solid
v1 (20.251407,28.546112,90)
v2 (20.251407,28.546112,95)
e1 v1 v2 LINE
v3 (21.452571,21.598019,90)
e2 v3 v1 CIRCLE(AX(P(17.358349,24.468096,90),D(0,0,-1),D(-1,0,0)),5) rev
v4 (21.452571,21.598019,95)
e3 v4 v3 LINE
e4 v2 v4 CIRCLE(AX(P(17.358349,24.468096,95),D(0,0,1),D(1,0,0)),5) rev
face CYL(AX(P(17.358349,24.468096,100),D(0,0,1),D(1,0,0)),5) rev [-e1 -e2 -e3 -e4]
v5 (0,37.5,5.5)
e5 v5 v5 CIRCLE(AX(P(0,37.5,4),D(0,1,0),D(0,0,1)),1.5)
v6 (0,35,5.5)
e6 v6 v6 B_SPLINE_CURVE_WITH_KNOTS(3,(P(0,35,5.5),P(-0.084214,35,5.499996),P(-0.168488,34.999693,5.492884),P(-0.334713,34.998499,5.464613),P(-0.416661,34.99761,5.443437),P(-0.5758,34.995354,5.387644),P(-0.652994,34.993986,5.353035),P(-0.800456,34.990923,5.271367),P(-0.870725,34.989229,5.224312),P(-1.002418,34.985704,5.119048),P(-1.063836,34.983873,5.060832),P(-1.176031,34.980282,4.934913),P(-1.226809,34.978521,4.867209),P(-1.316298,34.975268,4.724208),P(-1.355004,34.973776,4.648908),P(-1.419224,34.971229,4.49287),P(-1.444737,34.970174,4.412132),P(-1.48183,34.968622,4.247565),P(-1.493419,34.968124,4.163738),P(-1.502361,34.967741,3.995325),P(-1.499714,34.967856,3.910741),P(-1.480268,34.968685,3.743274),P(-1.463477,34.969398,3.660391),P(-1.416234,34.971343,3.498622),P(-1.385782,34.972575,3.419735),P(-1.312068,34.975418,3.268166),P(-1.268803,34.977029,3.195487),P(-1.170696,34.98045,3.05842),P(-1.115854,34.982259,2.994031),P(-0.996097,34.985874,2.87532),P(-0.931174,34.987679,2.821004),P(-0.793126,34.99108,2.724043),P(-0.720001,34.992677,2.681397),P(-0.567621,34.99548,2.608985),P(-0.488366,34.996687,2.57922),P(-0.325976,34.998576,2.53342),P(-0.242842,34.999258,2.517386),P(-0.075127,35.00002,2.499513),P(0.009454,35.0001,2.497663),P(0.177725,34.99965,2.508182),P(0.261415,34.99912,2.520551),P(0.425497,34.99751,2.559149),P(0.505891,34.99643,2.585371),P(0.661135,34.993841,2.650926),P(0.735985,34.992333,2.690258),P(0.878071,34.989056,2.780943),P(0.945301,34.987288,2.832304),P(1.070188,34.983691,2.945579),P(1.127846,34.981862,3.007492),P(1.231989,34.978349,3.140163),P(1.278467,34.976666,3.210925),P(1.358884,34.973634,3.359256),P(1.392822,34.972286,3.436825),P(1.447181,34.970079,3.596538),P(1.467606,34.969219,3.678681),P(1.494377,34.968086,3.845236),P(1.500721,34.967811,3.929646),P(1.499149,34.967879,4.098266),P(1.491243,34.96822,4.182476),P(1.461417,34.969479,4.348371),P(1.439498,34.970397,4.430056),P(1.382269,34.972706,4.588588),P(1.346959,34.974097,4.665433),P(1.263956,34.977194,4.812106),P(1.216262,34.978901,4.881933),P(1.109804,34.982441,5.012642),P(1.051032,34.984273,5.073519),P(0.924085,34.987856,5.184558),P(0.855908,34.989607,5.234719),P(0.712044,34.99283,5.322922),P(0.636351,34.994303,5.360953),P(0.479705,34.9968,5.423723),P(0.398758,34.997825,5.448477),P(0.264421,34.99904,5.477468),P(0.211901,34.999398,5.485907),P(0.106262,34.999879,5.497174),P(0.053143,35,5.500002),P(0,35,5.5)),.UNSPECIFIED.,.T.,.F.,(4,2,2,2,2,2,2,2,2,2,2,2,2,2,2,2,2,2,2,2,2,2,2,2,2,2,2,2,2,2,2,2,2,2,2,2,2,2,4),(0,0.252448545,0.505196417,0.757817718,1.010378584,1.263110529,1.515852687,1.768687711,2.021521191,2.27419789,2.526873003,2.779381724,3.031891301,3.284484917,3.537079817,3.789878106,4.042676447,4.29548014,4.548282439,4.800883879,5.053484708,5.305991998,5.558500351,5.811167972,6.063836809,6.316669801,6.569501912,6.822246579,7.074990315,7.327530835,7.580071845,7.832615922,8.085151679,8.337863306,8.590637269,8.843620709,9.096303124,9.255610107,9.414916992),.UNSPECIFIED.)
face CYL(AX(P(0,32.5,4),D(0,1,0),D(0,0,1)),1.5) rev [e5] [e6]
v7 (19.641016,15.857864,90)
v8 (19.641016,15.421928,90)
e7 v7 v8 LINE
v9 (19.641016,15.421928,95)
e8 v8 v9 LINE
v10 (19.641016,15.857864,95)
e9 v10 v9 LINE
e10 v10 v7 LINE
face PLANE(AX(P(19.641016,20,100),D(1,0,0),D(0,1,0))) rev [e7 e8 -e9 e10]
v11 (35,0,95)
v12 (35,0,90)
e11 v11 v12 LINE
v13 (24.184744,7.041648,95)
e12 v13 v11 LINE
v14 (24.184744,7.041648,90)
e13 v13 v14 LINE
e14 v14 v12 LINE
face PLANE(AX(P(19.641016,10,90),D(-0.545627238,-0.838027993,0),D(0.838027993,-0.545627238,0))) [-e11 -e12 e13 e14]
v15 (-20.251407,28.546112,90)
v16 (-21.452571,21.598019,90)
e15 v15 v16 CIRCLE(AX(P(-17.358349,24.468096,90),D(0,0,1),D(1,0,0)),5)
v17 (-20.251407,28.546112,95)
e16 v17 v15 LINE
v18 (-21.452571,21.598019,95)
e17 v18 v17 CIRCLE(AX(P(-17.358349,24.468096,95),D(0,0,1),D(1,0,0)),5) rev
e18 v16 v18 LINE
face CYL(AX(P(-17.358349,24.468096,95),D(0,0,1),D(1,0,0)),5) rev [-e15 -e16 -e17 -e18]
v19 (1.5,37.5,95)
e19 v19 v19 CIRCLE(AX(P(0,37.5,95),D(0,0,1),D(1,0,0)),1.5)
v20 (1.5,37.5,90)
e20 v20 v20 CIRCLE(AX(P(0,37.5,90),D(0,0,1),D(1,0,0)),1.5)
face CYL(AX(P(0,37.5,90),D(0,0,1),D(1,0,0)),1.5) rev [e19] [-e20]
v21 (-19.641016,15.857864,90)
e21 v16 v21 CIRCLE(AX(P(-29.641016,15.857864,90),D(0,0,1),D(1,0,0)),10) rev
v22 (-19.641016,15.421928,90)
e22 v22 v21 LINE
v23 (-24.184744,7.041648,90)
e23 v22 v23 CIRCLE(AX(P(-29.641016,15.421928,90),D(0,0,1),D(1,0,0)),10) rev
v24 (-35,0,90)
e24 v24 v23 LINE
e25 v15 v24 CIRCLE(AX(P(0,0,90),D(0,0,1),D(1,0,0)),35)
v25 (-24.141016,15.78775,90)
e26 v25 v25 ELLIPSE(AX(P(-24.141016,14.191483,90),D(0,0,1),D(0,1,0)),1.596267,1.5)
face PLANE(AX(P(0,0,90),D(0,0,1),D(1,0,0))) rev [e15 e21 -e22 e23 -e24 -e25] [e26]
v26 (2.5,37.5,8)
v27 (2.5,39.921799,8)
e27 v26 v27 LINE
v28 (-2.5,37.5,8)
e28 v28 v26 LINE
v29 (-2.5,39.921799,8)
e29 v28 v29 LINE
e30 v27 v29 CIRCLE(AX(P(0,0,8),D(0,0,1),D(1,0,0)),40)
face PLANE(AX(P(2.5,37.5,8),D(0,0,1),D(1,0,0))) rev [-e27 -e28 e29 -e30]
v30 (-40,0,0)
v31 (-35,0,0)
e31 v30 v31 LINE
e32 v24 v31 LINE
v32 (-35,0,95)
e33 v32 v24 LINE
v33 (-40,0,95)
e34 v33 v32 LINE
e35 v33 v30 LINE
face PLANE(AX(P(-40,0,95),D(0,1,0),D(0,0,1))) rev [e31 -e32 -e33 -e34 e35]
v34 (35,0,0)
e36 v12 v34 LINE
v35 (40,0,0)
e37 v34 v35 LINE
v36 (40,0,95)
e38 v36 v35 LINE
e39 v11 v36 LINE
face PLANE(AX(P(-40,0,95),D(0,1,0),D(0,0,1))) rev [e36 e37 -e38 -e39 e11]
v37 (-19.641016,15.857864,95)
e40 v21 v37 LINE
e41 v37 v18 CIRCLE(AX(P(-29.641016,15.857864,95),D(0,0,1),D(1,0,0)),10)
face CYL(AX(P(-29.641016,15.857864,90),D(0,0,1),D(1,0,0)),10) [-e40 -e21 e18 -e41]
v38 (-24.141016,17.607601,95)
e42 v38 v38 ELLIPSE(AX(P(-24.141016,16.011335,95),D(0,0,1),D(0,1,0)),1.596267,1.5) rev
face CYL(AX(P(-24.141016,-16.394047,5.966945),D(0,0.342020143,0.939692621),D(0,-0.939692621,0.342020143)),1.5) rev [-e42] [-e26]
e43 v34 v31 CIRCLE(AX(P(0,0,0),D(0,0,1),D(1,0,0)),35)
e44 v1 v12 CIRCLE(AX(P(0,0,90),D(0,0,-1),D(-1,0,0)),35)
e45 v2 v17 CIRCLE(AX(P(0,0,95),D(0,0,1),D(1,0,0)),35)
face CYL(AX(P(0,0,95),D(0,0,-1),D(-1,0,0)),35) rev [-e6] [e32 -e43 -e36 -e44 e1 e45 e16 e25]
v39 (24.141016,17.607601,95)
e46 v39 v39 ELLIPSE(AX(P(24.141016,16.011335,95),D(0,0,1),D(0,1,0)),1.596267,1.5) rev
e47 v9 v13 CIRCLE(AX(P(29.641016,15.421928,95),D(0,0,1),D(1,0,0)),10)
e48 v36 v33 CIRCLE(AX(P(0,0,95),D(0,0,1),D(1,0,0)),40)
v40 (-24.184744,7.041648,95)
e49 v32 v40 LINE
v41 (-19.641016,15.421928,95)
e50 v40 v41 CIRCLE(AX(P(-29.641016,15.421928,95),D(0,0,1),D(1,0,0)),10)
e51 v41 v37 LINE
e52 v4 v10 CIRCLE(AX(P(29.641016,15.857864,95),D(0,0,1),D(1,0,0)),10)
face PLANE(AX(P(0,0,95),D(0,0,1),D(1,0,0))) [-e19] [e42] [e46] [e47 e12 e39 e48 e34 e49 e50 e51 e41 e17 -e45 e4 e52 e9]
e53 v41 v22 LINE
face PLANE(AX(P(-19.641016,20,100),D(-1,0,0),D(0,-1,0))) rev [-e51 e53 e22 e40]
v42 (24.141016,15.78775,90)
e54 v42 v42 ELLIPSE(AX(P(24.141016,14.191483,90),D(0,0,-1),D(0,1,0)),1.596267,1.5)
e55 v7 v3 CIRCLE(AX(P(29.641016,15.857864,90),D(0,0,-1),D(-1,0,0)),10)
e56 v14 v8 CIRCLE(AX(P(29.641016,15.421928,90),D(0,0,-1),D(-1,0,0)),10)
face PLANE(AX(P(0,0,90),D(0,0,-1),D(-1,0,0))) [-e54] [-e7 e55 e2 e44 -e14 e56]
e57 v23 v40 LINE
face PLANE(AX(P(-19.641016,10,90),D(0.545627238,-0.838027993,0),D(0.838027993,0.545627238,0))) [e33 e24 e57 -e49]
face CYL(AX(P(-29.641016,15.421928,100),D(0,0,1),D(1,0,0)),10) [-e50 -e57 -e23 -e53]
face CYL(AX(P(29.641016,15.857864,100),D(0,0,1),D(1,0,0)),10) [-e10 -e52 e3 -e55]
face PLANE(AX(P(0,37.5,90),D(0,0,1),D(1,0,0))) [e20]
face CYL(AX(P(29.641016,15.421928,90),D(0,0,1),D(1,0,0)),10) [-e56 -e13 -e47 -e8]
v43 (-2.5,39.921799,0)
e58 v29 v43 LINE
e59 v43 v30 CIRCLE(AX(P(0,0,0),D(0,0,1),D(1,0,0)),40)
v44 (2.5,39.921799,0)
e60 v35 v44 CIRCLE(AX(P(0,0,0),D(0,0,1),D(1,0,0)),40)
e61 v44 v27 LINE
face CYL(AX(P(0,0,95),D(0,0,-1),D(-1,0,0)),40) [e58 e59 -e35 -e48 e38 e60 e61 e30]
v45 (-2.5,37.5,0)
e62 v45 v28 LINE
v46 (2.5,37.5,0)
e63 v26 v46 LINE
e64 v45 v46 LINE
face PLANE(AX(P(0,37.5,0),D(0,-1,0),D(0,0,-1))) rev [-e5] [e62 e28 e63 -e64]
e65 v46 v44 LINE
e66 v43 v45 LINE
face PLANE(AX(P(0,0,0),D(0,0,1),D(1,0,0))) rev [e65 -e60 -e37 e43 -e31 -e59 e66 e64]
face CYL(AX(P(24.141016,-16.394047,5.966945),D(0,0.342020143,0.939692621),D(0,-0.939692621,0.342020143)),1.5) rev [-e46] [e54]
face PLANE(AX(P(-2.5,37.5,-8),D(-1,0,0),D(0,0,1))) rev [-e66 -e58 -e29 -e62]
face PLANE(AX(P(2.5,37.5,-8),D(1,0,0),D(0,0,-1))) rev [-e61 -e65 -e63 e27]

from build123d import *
from OCP.BRepFilletAPI import BRepFilletAPI_MakeChamfer

# Parameters (mm, degrees)
SALIENTE_EXTRUIR1_DEPTH = 95
VACIADO1_T              = -5
CORTAR_EXTRUIR1_DEPTH   = 2.5
CROQUIS3_R              = 1.5
CORTAR_EXTRUIR4_DEPTH   = 5
SALIENTE_EXTRUIR2_DEPTH = 5
CHAFL_N1_SIZE           = 5
CHAFL_N1_SIZE2          = 1.819851171331016
CROQUIS5_R              = 1.5000000000000009
CORTAR_EXTRUIR5_DEPTH   = 107.86778586495213
CROQUIS6_W              = 80
CROQUIS6_H              = 6.500000000000014
CORTAR_EXTRUIR6_DEPTH   = 115.89125293076057
SALIENTE_EXTRUIR3_START = -5
SALIENTE_EXTRUIR3_DEPTH = 5
REDONDEO1_R             = 10
REDONDEO2_R             = 5
CROQUIS8_R              = 1.5000000000000004
CORTAR_EXTRUIR7_DEPTH   = 5


with BuildPart() as part:
    # Croquis1 → Saliente-Extruir1 (new body)
    with BuildSketch(Plane.XY):
        with BuildLine():
            Line((-40, 0), (40, 0))
            ThreePointArc((40, 0), (2.45e-15, 40), (-40, 0))
        make_face()
    extrude(amount=SALIENTE_EXTRUIR1_DEPTH)

    # Vaciado1
    vaciado1_openings = [part.faces().sort_by_distance(p)[0] for p in [
        (0, 16.976527263, 95),
        (0, 16.976527263, 0),
        (0, 0, 47.5),
    ]]
    offset(amount=VACIADO1_T, openings=vaciado1_openings)

    # Croquis2 → Cortar-Extruir1 (cut)
    with BuildSketch(Plane(origin=(0, 40, 0), x_dir=(1, 0, 0), z_dir=(0, 1, 0))):
        Polygon((2.499999999999998, 8), (-2.500000000000002, 8), (-2.499999999999997, -8), (2.500000000000003, -8), align=None)
    extrude(amount=-CORTAR_EXTRUIR1_DEPTH, mode=Mode.SUBTRACT)

    # Croquis3 → Cortar-Extruir4 (cut)
    with BuildSketch(Plane(origin=(0, 37.5, 0), x_dir=(1, 0, 0), z_dir=(0, 1, 0))):
        with Locations(Location((3.04e-15, -4.0000000000000036, 0), (0, 0, 270))):
            Circle(CROQUIS3_R)
    extrude(amount=-CORTAR_EXTRUIR4_DEPTH, mode=Mode.SUBTRACT)

    # Croquis4 → Saliente-Extruir2 (add, symmetric)
    with BuildSketch(Plane.XY.offset(95)):
        with BuildLine():
            Line((34.64101615137755, 20), (19.641016151377546, 20))
            Line((19.641016151377546, 20), (19.641016151377542, 9.999999999999998))
            Line((19.641016151377542, 9.999999999999998), (38.72983346207417, 10))
            ThreePointArc((38.72983346207417, 10), (37.024591736438325, 15.138679161342415), (34.64101615137755, 20))
        make_face()
        with BuildLine():
            Line((-19.641016151377542, 9.999999999999998), (-38.72983346207417, 10))
            ThreePointArc((-38.72983346207417, 10), (-37.024591736438325, 15.138679161342413), (-34.64101615137755, 20))
            Line((-34.64101615137755, 20), (-19.641016151377546, 20))
            Line((-19.641016151377546, 20), (-19.641016151377542, 9.999999999999998))
        make_face()
    extrude(amount=SALIENTE_EXTRUIR2_DEPTH, both=True)

    # Chaflán1: one chamfer whose edges measure the first distance from different faces: ONE call of the kernel's chamfer builder (chamfer() names one face for all edges)
    chafl_n1_edges_1 = [part.edges().sort_by_distance(p)[0] for p in [
        (27.14101615137755, 20, 100),
    ]]
    chafl_n1_side_1 = [part.faces().sort_by_distance(p)[0] for p in [
        (28.335600223521073, 14.80398786251226, 100),
    ]]
    chafl_n1_edges_2 = [part.edges().sort_by_distance(p)[0] for p in [
        (-27.14101615137755, 20, 100),
    ]]
    chafl_n1_side_2 = [part.faces().sort_by_distance(p)[0] for p in [
        (-28.33560022352108, 14.803987862512262, 100),
    ]]
    chafl_n1 = BRepFilletAPI_MakeChamfer(part.part.solid().wrapped)
    for e in chafl_n1_edges_1:
        chafl_n1.Add(CHAFL_N1_SIZE, CHAFL_N1_SIZE2, e.wrapped, chafl_n1_side_1[0].wrapped)  # the first distance lies on this face
    for e in chafl_n1_edges_2:
        chafl_n1.Add(CHAFL_N1_SIZE, CHAFL_N1_SIZE2, e.wrapped, chafl_n1_side_2[0].wrapped)  # the first distance lies on this face
    add(Compound.cast(chafl_n1.Shape()), mode=Mode.REPLACE)

    # Croquis5 → Cortar-Extruir5 (cut, through all)
    with BuildSketch(Plane(origin=(0, 33.89404716093429, 93.12312922859813), x_dir=(1, 0, 0), z_dir=(0, 0.3420201433256652, 0.9396926207859096))):
        with Locations(Location((-24.141016151377546, -17.446180589588106, 0), (0, 0, 270))):
            Circle(CROQUIS5_R)
        with Locations(Location((24.141016151377546, -17.446180589588106, 0), (0, 0, 90))):
            Circle(CROQUIS5_R)
    extrude(amount=-CORTAR_EXTRUIR5_DEPTH, mode=Mode.SUBTRACT)

    # Croquis6 → Cortar-Extruir6 (cut, through all)
    with BuildSketch(Plane(origin=(0, 0, 0), x_dir=(1, 0, 0), z_dir=(0, 1, 0))):
        with Locations((0, -98.25)):
            Rectangle(CROQUIS6_W, CROQUIS6_H)
    extrude(amount=CORTAR_EXTRUIR6_DEPTH, mode=Mode.SUBTRACT)

    # Croquis7 → Saliente-Extruir3 (add)
    with BuildSketch(Plane.XY.offset(95).offset(SALIENTE_EXTRUIR3_START)):
        with BuildLine():
            Line((19.641016151377542, 9.999999999999998), (35, 0))
            ThreePointArc((35, 0), (34.633334290733465, 5.052935375235389), (33.54101966249685, 10))
            Line((33.54101966249685, 10), (19.641016151377542, 9.999999999999998))
        make_face()
        with BuildLine():
            Line((-19.641016151377542, 9.999999999999998), (-35, 0))
            ThreePointArc((-35, 0), (-34.63333429073347, 5.0529353752354), (-33.54101966249685, 10))
            Line((-33.54101966249685, 10), (-19.641016151377542, 9.999999999999998))
        make_face()
        with BuildLine():
            Line((-19.641016151377546, 20), (-28.722813232690147, 20))
            ThreePointArc((-28.722813232690147, 20), (-26.75936830732511, 22.559614531124524), (-24.568594519878932, 24.927578368501326))
            Line((-24.568594519878932, 24.927578368501326), (-19.641016151377546, 20))
        make_face()
        with BuildLine():
            Line((19.641016151377546, 20), (28.722813232690147, 20))
            ThreePointArc((28.722813232690147, 20), (26.75936830732511, 22.559614531124524), (24.568594519878932, 24.927578368501326))
            Line((24.568594519878932, 24.927578368501326), (19.641016151377546, 20))
        make_face()
    extrude(amount=SALIENTE_EXTRUIR3_DEPTH)

    # Redondeo1
    redondeo1_edges = [part.edges().sort_by_distance(p)[0] for p in [
        (-19.641016151377546, 20, 92.5),
        (-19.641016151377542, 9.999999999999998, 92.5),
        (19.641016151377542, 9.999999999999998, 92.5),
        (19.641016151377546, 20, 92.5),
    ]]
    fillet(redondeo1_edges, radius=REDONDEO1_R)

    # Redondeo2
    # the kernel refuses this fillet: 5 mm, written as the material it adds along each edge
    with BuildSketch(Plane(origin=(24.568594519878932, 24.927578368501326, 90), x_dir=(-0.7663954409927094, 0.6423690746180039, 0), z_dir=(0, 0, 1))) as redondeo2_piece_1:
        with BuildLine():
            CenterArc((5.230741996241704, 4.983783963286785), REDONDEO2_R, 184.9379912398929, 89.6777604033997)
            Line((0.2492997983567551, 4.553396197276695), (-0.24884442143173913, 4.510357420675686))
            ThreePointArc((-0.24884442143173913, 4.510357420675686), (-0.2501886476220602, 2.859471760516391), (-0.4980734710416599, 0.04384994235474339))
            Line((-0.4980734710416599, 0.04384994235474339), (-0.04023647689416843, -0.49837839632867914))
            ThreePointArc((-0.04023647689416843, -0.49837839632867914), (2.816553382591687, -0.6135122569925113), (5.673343242077539, -0.49837839632867886))
            Line((5.673343242077539, -0.49837839632867886), (5.633106765183373, 2.3e-16))
        make_face()
    extrude(amount=5)
    with BuildSketch(Plane(origin=(-24.568594519878932, 24.927578368501326, 90), x_dir=(0.7663954409927088, 0.6423690746180043, 0), z_dir=(0, 0, 1))) as redondeo2_piece_2:
        with BuildLine():
            CenterArc((5.2307419962416954, -4.9837839632867835), REDONDEO2_R, 85.38424835670739, 89.67776040339973)
            Line((0.24929979835674423, -4.553396197276693), (-0.24884442143174967, -4.510357420675684))
            ThreePointArc((-0.24884442143174967, -4.510357420675684), (-0.2501886476220599, -2.8594717605163877), (-0.4980734710416599, -0.04384994235474303))
            Line((-0.4980734710416599, -0.04384994235474303), (-0.0402364768941681, 0.4983783963286791))
            ThreePointArc((-0.0402364768941681, 0.4983783963286791), (2.816553382591687, 0.6135122569925143), (5.673343242077529, 0.49837839632867875))
            Line((5.673343242077529, 0.49837839632867875), (5.633106765183362, 3.7e-16))
        make_face()
    extrude(amount=5)

    # Croquis8 → Cortar-Extruir7 (cut)
    with BuildSketch(Plane.XY.offset(95)):
        with Locations((2.3e-15, 37.50000000000001)):
            Circle(CROQUIS8_R)
    extrude(amount=-CORTAR_EXTRUIR7_DEPTH, mode=Mode.SUBTRACT)


solid = part.part
